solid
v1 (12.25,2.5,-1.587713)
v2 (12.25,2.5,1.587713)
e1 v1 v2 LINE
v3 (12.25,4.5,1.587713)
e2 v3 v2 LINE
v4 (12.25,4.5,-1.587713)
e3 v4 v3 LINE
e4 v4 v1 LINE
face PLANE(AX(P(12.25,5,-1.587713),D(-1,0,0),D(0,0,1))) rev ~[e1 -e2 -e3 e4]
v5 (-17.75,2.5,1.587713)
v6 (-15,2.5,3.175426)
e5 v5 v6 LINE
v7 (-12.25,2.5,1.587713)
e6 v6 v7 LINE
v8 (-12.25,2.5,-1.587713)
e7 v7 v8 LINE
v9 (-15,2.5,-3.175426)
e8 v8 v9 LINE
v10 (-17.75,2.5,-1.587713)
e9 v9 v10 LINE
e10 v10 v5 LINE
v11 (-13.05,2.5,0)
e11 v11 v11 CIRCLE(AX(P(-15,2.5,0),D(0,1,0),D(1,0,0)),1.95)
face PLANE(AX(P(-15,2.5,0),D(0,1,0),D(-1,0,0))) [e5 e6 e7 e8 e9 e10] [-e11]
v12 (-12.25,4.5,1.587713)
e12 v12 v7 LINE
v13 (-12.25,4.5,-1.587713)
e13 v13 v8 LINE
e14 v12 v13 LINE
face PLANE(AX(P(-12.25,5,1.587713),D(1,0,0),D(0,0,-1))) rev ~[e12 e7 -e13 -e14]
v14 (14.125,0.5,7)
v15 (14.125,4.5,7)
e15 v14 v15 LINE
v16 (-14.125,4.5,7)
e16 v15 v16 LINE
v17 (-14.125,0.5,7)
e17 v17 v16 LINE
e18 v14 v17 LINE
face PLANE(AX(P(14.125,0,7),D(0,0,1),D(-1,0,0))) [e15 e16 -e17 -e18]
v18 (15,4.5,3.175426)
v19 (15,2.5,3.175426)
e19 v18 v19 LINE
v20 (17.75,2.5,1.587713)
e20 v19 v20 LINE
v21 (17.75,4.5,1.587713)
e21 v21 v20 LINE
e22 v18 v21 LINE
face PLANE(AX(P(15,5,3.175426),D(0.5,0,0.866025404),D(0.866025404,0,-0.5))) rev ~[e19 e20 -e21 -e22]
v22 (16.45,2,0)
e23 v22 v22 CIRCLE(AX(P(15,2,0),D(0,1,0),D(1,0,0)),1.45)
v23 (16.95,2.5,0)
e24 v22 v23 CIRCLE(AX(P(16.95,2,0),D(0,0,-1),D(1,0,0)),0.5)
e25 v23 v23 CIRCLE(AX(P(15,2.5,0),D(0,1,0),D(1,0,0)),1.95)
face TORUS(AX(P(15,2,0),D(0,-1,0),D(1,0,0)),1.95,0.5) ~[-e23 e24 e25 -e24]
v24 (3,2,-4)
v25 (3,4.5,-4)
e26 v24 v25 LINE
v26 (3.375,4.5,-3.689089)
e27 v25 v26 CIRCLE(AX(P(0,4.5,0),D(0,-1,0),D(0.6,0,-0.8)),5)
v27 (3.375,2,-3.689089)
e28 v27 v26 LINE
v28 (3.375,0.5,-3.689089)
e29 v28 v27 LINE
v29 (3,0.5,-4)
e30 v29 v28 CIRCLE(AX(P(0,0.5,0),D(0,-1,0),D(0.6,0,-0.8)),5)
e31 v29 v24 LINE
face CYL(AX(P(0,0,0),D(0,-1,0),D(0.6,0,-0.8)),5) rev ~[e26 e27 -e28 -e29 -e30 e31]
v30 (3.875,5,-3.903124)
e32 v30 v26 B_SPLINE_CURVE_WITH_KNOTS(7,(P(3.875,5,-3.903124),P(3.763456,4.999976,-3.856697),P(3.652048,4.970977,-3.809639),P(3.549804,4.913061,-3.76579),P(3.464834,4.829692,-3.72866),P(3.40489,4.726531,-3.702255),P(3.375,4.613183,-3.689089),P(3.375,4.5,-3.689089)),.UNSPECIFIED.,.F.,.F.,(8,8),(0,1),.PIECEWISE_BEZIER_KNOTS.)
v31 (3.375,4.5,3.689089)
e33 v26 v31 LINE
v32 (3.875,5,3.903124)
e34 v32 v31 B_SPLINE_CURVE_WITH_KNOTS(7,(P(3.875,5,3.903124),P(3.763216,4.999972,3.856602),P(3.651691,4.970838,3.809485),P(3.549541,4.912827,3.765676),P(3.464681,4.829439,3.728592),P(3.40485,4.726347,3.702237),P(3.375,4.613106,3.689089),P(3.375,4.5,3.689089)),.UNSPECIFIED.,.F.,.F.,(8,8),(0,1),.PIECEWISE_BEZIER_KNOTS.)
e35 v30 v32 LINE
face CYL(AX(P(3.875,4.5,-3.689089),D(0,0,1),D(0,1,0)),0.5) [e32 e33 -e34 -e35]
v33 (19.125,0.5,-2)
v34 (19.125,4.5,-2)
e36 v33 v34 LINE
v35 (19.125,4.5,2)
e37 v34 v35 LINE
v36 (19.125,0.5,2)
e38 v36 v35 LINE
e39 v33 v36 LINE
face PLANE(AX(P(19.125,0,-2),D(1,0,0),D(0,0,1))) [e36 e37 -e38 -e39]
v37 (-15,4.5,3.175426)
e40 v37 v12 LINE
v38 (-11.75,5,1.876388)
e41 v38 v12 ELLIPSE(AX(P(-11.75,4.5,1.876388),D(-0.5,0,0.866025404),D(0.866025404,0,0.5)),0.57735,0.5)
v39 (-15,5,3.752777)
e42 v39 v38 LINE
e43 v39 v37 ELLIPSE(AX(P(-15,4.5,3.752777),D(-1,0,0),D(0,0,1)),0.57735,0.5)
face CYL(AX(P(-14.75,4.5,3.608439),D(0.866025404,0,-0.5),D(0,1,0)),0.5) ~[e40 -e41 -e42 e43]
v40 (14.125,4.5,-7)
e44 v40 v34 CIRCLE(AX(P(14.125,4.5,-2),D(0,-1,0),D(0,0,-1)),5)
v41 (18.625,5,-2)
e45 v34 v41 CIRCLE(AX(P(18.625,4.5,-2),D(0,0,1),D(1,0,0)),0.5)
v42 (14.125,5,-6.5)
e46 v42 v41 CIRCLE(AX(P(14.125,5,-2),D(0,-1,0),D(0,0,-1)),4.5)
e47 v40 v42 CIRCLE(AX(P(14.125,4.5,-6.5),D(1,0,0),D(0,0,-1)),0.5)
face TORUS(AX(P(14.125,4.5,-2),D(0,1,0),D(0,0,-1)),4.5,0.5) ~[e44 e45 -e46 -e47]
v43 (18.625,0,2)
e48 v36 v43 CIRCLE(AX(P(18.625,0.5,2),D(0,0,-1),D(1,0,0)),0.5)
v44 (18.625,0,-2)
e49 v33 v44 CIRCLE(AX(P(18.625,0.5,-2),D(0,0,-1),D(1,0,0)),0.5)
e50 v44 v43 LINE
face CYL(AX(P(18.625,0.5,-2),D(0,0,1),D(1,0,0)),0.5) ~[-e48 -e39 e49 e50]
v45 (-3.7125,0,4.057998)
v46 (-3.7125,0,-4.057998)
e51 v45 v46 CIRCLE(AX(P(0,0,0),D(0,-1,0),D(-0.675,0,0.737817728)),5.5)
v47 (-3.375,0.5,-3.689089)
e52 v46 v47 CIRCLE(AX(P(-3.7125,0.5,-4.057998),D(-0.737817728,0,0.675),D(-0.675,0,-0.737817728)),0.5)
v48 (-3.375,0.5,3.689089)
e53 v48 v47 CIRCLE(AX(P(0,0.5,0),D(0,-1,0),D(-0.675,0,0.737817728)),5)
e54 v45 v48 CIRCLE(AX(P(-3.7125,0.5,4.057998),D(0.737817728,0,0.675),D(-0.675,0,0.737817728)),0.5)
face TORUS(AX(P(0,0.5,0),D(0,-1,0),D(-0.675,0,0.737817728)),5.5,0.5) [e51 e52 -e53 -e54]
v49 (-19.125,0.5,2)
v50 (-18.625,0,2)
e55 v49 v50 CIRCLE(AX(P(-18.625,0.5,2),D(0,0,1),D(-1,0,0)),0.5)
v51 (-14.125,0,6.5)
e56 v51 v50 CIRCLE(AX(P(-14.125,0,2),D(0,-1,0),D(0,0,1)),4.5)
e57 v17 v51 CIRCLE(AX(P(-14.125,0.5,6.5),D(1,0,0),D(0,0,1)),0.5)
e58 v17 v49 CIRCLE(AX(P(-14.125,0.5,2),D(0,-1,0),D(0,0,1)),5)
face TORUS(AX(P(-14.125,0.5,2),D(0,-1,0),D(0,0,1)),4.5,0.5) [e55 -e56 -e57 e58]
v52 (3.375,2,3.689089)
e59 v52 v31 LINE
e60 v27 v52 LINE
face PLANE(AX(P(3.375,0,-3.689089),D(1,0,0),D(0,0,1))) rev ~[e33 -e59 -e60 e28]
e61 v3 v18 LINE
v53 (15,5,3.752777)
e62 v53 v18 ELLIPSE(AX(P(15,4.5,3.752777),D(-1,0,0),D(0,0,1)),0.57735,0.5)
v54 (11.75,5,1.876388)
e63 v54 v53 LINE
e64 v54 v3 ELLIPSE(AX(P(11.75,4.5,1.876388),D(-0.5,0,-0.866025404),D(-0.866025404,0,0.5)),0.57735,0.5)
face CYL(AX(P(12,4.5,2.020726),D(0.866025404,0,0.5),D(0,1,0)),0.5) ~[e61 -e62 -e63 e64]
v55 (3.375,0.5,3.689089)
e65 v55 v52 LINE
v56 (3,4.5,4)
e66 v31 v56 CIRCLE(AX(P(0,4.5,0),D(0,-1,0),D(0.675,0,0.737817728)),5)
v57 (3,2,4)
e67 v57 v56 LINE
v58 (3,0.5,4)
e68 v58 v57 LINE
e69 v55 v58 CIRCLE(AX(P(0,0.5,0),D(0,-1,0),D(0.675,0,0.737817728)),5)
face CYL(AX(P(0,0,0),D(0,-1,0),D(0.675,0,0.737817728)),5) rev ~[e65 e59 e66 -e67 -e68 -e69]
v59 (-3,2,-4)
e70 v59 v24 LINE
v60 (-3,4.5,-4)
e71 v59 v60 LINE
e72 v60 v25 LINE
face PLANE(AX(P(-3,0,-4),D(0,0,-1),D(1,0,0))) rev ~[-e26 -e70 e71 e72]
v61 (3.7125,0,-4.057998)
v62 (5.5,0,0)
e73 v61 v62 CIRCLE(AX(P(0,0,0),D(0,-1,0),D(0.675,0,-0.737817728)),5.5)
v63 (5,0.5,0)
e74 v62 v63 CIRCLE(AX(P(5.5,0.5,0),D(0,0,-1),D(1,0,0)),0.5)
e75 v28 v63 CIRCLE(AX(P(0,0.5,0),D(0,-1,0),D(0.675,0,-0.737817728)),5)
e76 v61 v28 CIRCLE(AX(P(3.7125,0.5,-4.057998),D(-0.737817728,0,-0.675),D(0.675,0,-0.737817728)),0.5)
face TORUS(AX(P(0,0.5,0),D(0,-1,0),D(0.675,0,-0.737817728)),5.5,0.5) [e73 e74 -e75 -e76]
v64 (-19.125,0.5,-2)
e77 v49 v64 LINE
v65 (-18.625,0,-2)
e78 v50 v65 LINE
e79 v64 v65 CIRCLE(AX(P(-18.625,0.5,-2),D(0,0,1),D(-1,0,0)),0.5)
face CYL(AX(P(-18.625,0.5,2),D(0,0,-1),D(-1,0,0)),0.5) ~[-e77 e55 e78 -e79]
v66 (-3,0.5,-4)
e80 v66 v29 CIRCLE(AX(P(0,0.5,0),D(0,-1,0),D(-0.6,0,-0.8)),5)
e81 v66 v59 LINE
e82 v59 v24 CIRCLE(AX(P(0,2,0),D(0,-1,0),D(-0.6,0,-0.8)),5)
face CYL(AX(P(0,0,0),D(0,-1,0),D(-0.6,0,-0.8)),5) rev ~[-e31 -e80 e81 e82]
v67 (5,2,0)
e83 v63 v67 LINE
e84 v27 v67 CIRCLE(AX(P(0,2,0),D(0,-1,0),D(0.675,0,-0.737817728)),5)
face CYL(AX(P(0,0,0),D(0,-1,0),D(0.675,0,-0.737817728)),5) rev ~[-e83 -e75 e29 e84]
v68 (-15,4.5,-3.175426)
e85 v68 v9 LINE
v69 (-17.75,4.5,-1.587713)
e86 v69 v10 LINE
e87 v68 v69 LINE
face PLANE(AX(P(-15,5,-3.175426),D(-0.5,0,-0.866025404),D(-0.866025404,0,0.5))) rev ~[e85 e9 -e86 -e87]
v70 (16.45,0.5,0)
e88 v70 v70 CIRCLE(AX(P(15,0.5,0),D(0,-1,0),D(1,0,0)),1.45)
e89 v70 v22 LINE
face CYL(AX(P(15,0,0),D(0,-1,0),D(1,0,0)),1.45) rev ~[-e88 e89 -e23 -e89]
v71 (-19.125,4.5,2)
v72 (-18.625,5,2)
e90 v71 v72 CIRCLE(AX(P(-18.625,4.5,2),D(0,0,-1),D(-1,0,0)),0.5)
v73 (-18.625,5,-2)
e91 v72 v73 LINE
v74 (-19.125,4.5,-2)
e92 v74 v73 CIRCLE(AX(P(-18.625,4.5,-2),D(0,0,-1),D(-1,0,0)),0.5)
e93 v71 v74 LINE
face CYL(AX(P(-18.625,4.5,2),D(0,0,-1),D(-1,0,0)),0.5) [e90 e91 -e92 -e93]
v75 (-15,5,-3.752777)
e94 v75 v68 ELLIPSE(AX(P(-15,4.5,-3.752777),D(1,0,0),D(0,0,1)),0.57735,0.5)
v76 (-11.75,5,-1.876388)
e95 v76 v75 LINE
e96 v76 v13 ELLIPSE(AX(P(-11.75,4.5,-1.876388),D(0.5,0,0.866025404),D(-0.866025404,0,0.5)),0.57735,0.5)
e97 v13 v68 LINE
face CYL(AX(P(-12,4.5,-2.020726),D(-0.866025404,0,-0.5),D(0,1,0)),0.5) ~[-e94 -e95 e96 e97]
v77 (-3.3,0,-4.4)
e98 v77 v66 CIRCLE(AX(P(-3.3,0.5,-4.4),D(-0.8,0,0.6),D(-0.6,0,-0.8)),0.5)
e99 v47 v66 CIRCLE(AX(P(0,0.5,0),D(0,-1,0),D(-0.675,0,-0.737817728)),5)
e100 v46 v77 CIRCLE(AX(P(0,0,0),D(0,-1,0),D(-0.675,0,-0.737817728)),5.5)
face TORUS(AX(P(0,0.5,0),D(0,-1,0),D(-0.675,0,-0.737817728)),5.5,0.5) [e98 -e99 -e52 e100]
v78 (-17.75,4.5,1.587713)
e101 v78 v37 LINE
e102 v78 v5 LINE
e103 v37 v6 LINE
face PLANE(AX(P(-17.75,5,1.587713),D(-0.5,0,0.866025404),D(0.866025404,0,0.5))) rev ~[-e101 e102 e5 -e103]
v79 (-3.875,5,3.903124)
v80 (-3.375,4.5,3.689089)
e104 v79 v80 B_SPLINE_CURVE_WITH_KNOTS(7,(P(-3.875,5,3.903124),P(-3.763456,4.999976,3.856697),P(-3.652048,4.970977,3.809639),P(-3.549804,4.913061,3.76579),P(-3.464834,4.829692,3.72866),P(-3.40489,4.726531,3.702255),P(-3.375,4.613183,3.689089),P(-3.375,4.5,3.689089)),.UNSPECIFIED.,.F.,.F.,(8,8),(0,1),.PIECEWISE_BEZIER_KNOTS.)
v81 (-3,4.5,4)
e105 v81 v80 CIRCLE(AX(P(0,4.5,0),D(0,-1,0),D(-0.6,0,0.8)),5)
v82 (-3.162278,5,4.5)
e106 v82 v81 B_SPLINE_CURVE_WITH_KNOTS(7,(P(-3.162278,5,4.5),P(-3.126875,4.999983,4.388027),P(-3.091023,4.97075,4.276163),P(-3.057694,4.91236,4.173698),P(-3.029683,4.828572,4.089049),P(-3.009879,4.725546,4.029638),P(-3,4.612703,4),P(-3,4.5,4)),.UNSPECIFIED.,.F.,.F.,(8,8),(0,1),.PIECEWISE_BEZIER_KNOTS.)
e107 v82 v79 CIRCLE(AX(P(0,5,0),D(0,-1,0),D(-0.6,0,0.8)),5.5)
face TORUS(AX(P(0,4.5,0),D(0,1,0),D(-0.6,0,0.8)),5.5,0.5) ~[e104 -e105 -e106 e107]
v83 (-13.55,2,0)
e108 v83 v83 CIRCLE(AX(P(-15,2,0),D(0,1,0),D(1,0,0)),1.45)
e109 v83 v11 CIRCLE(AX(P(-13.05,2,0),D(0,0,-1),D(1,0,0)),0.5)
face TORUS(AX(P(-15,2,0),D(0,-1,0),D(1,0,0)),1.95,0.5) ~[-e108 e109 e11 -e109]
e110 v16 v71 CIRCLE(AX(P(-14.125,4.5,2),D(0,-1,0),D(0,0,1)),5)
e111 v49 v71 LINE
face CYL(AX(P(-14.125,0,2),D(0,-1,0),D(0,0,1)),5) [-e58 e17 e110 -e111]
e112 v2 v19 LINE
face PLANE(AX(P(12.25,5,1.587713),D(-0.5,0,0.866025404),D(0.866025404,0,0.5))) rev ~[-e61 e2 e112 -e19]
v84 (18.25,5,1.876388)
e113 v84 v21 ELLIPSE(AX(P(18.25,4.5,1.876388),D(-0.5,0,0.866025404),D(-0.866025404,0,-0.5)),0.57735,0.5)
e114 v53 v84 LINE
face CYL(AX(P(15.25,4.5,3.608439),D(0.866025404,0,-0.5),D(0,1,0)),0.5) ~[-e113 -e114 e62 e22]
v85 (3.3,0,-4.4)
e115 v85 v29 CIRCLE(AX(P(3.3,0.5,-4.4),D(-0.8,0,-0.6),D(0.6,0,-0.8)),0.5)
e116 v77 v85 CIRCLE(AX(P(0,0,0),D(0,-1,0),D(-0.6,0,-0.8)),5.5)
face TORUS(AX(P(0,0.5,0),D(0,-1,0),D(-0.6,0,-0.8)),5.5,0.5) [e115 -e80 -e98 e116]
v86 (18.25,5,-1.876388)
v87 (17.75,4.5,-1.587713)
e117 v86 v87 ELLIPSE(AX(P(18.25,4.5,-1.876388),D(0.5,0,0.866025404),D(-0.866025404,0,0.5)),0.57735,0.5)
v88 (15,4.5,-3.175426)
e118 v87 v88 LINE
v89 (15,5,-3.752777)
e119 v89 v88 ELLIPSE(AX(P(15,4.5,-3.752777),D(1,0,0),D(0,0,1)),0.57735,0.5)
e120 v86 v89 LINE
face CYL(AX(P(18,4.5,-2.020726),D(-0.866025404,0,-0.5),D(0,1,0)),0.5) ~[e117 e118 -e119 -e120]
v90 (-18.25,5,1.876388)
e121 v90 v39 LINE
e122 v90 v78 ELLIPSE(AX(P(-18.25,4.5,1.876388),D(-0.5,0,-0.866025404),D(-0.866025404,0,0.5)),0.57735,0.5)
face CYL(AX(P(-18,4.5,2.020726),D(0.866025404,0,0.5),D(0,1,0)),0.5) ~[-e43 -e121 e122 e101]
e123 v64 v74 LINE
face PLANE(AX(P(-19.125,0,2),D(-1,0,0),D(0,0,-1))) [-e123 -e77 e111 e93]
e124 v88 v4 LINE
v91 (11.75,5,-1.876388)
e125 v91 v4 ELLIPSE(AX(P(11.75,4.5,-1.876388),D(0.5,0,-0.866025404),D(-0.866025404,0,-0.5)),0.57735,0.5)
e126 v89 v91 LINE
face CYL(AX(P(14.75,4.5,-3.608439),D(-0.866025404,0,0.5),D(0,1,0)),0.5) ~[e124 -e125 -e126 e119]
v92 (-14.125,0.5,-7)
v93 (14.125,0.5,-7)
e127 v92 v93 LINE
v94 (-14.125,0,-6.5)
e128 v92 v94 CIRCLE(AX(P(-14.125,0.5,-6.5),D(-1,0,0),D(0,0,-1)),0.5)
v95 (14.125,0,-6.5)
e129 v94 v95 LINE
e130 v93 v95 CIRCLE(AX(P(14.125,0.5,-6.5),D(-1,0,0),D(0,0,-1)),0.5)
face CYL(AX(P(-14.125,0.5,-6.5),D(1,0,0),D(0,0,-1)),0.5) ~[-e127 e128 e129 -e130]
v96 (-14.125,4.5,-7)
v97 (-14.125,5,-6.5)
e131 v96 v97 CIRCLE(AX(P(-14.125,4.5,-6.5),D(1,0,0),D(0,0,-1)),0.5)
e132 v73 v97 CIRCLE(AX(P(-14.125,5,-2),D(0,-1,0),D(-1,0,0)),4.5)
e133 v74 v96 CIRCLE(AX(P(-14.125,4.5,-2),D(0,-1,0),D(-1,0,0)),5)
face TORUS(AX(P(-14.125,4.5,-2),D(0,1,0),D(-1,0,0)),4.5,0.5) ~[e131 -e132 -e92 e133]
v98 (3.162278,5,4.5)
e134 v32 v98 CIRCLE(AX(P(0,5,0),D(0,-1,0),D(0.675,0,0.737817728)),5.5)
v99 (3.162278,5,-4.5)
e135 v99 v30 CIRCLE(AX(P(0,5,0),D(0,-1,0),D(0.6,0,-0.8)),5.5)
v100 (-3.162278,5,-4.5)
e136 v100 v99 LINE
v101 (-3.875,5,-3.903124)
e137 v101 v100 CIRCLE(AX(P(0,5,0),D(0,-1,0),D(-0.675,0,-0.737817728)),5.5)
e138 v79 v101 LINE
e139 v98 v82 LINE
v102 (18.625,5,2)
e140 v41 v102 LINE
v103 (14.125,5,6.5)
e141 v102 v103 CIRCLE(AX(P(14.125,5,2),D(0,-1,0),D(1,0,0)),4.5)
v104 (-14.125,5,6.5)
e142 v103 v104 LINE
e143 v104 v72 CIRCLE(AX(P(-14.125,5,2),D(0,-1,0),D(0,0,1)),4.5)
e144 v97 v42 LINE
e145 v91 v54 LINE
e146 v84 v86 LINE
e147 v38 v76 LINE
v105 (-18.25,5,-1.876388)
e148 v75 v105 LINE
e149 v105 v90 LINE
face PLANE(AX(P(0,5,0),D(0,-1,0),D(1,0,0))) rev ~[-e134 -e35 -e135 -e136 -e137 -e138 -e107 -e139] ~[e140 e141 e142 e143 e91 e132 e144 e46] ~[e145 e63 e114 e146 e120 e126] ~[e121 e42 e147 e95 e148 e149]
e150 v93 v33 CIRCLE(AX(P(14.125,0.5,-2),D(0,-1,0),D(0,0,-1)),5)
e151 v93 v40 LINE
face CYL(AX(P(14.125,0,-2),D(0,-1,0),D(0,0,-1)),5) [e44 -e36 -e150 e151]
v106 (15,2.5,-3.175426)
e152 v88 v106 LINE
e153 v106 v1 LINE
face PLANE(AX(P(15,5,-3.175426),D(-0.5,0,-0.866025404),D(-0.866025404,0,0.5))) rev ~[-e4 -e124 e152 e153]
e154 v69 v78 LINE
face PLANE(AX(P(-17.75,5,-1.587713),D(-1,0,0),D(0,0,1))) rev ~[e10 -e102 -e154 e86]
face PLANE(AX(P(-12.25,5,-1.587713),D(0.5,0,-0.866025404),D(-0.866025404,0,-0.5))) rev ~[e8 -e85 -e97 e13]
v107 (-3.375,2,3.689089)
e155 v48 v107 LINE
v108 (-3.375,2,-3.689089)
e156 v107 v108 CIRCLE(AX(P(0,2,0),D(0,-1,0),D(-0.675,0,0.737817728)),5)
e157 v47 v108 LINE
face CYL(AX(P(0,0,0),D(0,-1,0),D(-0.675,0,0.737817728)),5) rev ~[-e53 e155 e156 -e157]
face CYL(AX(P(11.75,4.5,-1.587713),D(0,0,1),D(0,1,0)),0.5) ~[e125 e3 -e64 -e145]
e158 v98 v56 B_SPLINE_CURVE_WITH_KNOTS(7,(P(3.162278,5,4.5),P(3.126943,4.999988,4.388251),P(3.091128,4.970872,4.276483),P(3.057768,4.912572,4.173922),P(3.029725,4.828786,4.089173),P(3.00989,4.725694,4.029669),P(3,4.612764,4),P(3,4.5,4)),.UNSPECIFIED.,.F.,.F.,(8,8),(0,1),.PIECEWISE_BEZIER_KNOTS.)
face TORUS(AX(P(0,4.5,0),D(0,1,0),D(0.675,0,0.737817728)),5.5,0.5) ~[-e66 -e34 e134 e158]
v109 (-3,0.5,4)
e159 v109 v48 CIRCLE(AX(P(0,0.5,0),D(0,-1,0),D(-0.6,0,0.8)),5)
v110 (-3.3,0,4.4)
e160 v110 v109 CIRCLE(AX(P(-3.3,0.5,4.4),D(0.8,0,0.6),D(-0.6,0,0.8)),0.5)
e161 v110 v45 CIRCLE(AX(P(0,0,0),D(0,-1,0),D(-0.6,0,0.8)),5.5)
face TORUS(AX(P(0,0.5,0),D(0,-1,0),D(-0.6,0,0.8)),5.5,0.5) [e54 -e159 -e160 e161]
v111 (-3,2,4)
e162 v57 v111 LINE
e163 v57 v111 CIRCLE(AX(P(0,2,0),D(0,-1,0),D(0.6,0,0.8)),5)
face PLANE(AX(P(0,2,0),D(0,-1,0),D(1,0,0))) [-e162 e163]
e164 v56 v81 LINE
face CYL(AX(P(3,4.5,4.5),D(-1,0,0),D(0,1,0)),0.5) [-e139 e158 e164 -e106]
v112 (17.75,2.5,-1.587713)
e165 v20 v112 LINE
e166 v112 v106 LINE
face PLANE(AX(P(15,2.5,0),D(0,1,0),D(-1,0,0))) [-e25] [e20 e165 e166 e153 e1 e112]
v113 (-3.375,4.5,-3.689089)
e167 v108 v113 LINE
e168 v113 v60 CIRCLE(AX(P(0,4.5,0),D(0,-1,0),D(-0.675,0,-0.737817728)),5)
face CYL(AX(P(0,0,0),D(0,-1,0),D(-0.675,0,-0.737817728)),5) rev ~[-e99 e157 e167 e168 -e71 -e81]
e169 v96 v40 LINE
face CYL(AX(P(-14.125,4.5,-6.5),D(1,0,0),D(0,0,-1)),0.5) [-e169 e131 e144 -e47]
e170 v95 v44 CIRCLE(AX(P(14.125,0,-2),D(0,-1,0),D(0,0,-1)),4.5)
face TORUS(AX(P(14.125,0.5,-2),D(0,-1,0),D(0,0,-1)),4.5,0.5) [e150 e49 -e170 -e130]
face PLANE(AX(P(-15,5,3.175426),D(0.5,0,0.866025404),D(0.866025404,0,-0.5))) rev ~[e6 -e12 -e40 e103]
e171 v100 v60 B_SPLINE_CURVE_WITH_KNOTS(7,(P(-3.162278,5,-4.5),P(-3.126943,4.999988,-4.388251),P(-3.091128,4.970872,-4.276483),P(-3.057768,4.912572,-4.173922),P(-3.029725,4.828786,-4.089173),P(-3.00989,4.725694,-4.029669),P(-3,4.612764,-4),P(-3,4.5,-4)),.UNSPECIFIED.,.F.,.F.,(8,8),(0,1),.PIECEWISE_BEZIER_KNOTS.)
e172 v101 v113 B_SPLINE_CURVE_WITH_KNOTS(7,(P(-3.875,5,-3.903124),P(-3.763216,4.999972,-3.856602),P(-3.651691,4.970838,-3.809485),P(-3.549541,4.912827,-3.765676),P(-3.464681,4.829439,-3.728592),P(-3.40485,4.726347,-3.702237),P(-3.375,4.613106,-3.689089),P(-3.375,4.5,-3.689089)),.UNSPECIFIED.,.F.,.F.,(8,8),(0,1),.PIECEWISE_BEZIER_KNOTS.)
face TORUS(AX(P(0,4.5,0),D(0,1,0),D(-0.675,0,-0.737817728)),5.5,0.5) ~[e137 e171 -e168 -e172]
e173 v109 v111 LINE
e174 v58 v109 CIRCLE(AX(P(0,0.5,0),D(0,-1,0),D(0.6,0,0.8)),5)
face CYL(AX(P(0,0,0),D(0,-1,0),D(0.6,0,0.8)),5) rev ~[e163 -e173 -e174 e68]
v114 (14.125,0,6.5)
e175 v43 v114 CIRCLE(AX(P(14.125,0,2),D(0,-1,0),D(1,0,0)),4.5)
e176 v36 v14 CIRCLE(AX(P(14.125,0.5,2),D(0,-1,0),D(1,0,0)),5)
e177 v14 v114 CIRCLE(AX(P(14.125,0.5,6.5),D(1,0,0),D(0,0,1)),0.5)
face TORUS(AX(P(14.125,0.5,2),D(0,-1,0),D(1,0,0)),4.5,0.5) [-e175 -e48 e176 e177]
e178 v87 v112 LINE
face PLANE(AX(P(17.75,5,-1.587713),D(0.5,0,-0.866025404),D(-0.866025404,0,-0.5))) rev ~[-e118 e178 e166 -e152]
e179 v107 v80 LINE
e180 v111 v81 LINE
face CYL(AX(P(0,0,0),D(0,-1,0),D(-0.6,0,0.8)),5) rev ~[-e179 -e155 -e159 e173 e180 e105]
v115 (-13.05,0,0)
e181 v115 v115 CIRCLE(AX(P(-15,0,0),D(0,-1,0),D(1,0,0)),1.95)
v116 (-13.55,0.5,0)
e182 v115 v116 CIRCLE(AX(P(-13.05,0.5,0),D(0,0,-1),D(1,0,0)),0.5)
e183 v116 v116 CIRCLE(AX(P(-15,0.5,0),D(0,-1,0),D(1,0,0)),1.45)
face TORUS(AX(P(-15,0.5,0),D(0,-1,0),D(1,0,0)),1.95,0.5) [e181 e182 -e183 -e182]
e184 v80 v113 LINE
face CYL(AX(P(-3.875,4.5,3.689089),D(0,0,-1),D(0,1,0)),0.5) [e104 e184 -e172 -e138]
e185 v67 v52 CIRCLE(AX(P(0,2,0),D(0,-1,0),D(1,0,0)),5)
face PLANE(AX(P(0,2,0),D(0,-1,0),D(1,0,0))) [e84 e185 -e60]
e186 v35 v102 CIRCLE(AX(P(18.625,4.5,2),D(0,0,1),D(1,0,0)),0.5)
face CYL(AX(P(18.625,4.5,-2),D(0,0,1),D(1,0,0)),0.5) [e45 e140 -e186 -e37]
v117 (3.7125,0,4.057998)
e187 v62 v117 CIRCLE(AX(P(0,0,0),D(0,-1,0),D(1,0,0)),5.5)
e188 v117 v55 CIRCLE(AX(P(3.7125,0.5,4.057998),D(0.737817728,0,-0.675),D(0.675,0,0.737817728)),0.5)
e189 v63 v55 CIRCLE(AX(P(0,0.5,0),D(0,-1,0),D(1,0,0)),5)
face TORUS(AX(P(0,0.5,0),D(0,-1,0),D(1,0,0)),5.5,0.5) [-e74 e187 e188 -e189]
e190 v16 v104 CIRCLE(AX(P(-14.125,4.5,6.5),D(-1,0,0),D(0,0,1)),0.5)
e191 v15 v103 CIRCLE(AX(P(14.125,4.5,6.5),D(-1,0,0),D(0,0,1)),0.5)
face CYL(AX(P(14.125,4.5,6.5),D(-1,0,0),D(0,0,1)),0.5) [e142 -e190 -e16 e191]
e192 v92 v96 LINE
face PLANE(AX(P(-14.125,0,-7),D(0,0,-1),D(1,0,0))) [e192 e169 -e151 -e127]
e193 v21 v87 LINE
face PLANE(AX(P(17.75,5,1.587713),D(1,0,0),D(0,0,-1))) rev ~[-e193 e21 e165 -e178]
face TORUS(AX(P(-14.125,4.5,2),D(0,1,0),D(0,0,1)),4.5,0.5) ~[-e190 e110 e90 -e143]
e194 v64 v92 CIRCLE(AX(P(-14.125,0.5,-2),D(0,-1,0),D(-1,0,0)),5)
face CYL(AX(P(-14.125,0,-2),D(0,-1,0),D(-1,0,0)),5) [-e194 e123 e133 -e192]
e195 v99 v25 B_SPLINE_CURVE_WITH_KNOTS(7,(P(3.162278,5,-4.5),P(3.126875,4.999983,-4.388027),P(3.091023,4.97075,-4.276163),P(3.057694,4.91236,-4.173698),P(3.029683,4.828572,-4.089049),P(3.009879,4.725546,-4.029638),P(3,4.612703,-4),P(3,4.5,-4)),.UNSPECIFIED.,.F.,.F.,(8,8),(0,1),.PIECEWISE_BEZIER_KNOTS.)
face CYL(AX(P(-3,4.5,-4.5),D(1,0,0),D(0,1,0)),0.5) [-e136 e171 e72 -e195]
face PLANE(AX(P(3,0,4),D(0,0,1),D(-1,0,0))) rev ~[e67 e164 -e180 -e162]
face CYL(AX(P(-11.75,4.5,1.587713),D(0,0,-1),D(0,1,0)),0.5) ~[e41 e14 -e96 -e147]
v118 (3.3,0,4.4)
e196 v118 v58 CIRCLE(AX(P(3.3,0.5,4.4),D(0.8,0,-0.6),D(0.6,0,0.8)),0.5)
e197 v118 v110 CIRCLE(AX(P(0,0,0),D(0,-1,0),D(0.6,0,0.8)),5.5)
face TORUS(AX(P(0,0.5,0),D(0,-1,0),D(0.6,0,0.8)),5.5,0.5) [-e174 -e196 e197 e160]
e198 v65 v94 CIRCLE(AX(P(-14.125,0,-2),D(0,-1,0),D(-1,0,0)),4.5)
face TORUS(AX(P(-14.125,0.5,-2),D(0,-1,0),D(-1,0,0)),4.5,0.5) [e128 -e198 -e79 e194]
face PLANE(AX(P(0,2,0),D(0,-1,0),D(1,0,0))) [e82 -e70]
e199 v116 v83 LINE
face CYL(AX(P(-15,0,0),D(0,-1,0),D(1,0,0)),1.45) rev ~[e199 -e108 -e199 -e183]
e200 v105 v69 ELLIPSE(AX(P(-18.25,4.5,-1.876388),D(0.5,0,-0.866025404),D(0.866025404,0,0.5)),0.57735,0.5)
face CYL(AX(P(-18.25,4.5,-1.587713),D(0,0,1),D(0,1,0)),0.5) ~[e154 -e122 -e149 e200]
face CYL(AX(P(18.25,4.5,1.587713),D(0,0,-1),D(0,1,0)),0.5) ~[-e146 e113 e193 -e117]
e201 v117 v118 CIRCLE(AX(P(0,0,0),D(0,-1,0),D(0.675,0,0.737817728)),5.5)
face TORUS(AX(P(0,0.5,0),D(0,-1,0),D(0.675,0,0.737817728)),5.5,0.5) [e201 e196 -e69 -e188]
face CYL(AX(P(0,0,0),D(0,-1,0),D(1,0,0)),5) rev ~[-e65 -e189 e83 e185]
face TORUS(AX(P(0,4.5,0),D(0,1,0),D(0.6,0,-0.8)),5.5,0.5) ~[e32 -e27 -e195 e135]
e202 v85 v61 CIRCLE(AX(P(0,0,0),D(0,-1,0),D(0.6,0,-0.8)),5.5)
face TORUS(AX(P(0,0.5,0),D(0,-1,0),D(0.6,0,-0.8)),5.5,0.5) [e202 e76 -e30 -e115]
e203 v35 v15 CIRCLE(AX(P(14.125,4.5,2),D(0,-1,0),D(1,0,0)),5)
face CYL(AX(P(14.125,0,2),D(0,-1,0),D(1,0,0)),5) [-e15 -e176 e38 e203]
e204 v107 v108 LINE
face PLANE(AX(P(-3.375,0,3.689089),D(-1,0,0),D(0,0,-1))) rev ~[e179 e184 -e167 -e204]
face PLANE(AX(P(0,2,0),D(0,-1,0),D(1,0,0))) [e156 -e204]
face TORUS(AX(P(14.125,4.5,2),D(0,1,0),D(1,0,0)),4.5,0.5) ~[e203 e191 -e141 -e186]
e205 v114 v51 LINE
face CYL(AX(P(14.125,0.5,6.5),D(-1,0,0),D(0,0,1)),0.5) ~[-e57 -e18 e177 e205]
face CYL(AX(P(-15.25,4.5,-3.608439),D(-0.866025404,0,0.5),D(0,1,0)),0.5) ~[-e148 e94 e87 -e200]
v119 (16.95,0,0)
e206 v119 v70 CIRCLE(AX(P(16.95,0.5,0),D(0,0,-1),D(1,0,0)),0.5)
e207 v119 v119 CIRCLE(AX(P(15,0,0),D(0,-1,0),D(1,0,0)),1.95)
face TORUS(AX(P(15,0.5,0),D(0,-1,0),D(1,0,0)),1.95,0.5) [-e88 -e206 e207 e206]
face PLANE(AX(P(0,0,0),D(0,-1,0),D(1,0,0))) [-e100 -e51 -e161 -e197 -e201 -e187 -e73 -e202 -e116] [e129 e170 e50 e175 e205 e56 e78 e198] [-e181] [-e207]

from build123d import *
from build123d import SkipClean  # not in build123d's __all__

# Parameters (mm, degrees)
F0_R     = 1.45
F1_DEPTH = 5
F2_R     = 1.45
F3_DEPTH = 2.5
F5_DEPTH = 2
F6_DEPTH = 5.001
F7_R     = 0.5


with BuildPart() as f1:
    # F0 (on Front) → F1 (new body)
    with BuildSketch(Plane.XZ):
        with BuildLine():
            ThreePointArc((19.125, 2), (17.6605339059, 5.5355339059), (14.125, 7))
            Line((14.125, 7), (-14.125, 7))
            ThreePointArc((-14.125, 7), (-17.6605339059, 5.5355339059), (-19.125, 2))
            Line((-19.125, 2), (-19.125, -2))
            ThreePointArc((-19.125, -2), (-17.6605339059, -5.5355339059), (-14.125, -7))
            Line((-14.125, -7), (14.125, -7))
            ThreePointArc((14.125, -7), (17.6605339059, -5.5355339059), (19.125, -2))
            Line((19.125, -2), (19.125, 2))
        make_face()
        with Locations((-15, 0)):
            Circle(F0_R, mode=Mode.SUBTRACT)
        with Locations((15, 0)):
            Circle(F0_R, mode=Mode.SUBTRACT)
    extrude(amount=-F1_DEPTH)

    # F2 (on face) → F3 (cut)
    with BuildSketch(Plane(origin=(0, 5, 0), x_dir=(-1, 0, 0), z_dir=(0, 1, 0))):
        Polygon((-12.25, -1.5877132403), (-12.25, 1.5877132403), (-15, 3.1754264805), (-17.75, 1.5877132403), (-17.75, -1.5877132403), (-15, -3.1754264805), align=None)
        with Locations((-15, 0)):
            Circle(F2_R, mode=Mode.SUBTRACT)
        Polygon((17.75, 1.5877132403), (15, 3.1754264805), (12.25, 1.5877132403), (12.25, -1.5877132403), (15, -3.1754264805), (17.75, -1.5877132403), align=None)
        with Locations((15, 0)):
            Circle(F2_R, mode=Mode.SUBTRACT)
    extrude(amount=-F3_DEPTH, mode=Mode.SUBTRACT)

    # F4 (on Front) → F5 (cut)
    with BuildSketch(Plane.XZ):
        with BuildLine():
            ThreePointArc((3.375, 3.6890886408), (3.1912885671, 3.8491138307), (3, 4))
            Line((3, 4), (-3, 4))
            ThreePointArc((-3, 4), (-3.1912885671, 3.8491138307), (-3.375, 3.6890886408))
            Line((-3.375, 3.6890886408), (-3.375, -3.6890886408))
            ThreePointArc((-3.375, -3.6890886408), (-3.1912885671, -3.8491138307), (-3, -4))
            Line((-3, -4), (3, -4))
            ThreePointArc((3, -4), (3.1912885671, -3.8491138307), (3.375, -3.6890886408))
            Line((3.375, -3.6890886408), (3.375, 3.6890886408))
        make_face()
        with BuildLine():
            Line((-3, 4), (3, 4))
            ThreePointArc((3, 4), (0, 5), (-3, 4))
        make_face()
        with BuildLine():
            ThreePointArc((5, 0), (4.5757513044, 2.0155644371), (3.375, 3.6890886408))
            Line((3.375, 3.6890886408), (3.375, -3.6890886408))
            ThreePointArc((3.375, -3.6890886408), (4.5757513044, -2.0155644371), (5, 0))
        make_face()
        with BuildLine():
            Line((-3.375, -3.6890886408), (-3.375, 3.6890886408))
            ThreePointArc((-3.375, 3.6890886408), (-5, 0), (-3.375, -3.6890886408))
        make_face()
        with BuildLine():
            ThreePointArc((-3, -4), (0, -5), (3, -4))
            Line((3, -4), (-3, -4))
        make_face()
    extrude(amount=-F5_DEPTH, mode=Mode.SUBTRACT)

    # F4 (on Front) → F6 (cut, through all)
    with BuildSketch(Plane.XZ):
        with BuildLine():
            ThreePointArc((3.375, 3.6890886408), (3.1912885671, 3.8491138307), (3, 4))
            Line((3, 4), (-3, 4))
            ThreePointArc((-3, 4), (-3.1912885671, 3.8491138307), (-3.375, 3.6890886408))
            Line((-3.375, 3.6890886408), (-3.375, -3.6890886408))
            ThreePointArc((-3.375, -3.6890886408), (-3.1912885671, -3.8491138307), (-3, -4))
            Line((-3, -4), (3, -4))
            ThreePointArc((3, -4), (3.1912885671, -3.8491138307), (3.375, -3.6890886408))
            Line((3.375, -3.6890886408), (3.375, 3.6890886408))
        make_face()
    with SkipClean():  # cleaning this boolean's faces spoils the solid; the shape is the same uncleaned
        extrude(amount=-F6_DEPTH, mode=Mode.SUBTRACT)

    # F7
    f7_edges = [f1.edges().sort_by_distance(p)[0] for p in [
        (0, 0, 7),
        (0, 5, 7),
        (19.125, 5, 0),
        (17.660534, 5, -5.535534),
        (17.660534, 5, 5.535534),
        (0, 5, -7),
        (-17.660534, 5, -5.535534),
        (-17.660534, 5, 5.535534),
        (-19.125, 5, 0),
        (-17.75, 5, 0),
        (-16.375, 5, -2.38157),
        (-16.375, 5, 2.38157),
        (-13.625, 5, -2.38157),
        (-13.625, 5, 2.38157),
        (-12.25, 5, 0),
        (3.191289, 5, -3.849114),
        (3.375, 5, 0),
        (3.191289, 5, 3.849114),
        (0, 5, 4),
        (-3.191289, 5, 3.849114),
        (-3.375, 5, 0),
        (-3.191289, 5, -3.849114),
        (0, 5, -4),
        (13.625, 5, -2.38157),
        (16.375, 5, -2.38157),
        (12.25, 5, 0),
        (17.75, 5, 0),
        (13.625, 5, 2.38157),
        (16.375, 5, 2.38157),
        (-16.45, 0, 0),
        (-13.55, 1.25, 0),
        (-16.45, 2.5, 0),
        (13.55, 0, 0),
        (16.45, 1.25, 0),
        (13.55, 2.5, 0),
        (19.125, 0, 0),
        (17.660534, 0, -5.535534),
        (17.660534, 0, 5.535534),
        (0, 0, -7),
        (-17.660534, 0, -5.535534),
        (-17.660534, 0, 5.535534),
        (-19.125, 0, 0),
        (0, 0, -5),
        (3.191289, 0, -3.849114),
        (5, 0, 0),
        (3.191289, 0, 3.849114),
        (0, 0, 5),
        (-3.191289, 0, 3.849114),
        (-5, 0, 0),
        (-3.191289, 0, -3.849114),
    ]]
    fillet(f7_edges, radius=F7_R)


solid = f1.part
